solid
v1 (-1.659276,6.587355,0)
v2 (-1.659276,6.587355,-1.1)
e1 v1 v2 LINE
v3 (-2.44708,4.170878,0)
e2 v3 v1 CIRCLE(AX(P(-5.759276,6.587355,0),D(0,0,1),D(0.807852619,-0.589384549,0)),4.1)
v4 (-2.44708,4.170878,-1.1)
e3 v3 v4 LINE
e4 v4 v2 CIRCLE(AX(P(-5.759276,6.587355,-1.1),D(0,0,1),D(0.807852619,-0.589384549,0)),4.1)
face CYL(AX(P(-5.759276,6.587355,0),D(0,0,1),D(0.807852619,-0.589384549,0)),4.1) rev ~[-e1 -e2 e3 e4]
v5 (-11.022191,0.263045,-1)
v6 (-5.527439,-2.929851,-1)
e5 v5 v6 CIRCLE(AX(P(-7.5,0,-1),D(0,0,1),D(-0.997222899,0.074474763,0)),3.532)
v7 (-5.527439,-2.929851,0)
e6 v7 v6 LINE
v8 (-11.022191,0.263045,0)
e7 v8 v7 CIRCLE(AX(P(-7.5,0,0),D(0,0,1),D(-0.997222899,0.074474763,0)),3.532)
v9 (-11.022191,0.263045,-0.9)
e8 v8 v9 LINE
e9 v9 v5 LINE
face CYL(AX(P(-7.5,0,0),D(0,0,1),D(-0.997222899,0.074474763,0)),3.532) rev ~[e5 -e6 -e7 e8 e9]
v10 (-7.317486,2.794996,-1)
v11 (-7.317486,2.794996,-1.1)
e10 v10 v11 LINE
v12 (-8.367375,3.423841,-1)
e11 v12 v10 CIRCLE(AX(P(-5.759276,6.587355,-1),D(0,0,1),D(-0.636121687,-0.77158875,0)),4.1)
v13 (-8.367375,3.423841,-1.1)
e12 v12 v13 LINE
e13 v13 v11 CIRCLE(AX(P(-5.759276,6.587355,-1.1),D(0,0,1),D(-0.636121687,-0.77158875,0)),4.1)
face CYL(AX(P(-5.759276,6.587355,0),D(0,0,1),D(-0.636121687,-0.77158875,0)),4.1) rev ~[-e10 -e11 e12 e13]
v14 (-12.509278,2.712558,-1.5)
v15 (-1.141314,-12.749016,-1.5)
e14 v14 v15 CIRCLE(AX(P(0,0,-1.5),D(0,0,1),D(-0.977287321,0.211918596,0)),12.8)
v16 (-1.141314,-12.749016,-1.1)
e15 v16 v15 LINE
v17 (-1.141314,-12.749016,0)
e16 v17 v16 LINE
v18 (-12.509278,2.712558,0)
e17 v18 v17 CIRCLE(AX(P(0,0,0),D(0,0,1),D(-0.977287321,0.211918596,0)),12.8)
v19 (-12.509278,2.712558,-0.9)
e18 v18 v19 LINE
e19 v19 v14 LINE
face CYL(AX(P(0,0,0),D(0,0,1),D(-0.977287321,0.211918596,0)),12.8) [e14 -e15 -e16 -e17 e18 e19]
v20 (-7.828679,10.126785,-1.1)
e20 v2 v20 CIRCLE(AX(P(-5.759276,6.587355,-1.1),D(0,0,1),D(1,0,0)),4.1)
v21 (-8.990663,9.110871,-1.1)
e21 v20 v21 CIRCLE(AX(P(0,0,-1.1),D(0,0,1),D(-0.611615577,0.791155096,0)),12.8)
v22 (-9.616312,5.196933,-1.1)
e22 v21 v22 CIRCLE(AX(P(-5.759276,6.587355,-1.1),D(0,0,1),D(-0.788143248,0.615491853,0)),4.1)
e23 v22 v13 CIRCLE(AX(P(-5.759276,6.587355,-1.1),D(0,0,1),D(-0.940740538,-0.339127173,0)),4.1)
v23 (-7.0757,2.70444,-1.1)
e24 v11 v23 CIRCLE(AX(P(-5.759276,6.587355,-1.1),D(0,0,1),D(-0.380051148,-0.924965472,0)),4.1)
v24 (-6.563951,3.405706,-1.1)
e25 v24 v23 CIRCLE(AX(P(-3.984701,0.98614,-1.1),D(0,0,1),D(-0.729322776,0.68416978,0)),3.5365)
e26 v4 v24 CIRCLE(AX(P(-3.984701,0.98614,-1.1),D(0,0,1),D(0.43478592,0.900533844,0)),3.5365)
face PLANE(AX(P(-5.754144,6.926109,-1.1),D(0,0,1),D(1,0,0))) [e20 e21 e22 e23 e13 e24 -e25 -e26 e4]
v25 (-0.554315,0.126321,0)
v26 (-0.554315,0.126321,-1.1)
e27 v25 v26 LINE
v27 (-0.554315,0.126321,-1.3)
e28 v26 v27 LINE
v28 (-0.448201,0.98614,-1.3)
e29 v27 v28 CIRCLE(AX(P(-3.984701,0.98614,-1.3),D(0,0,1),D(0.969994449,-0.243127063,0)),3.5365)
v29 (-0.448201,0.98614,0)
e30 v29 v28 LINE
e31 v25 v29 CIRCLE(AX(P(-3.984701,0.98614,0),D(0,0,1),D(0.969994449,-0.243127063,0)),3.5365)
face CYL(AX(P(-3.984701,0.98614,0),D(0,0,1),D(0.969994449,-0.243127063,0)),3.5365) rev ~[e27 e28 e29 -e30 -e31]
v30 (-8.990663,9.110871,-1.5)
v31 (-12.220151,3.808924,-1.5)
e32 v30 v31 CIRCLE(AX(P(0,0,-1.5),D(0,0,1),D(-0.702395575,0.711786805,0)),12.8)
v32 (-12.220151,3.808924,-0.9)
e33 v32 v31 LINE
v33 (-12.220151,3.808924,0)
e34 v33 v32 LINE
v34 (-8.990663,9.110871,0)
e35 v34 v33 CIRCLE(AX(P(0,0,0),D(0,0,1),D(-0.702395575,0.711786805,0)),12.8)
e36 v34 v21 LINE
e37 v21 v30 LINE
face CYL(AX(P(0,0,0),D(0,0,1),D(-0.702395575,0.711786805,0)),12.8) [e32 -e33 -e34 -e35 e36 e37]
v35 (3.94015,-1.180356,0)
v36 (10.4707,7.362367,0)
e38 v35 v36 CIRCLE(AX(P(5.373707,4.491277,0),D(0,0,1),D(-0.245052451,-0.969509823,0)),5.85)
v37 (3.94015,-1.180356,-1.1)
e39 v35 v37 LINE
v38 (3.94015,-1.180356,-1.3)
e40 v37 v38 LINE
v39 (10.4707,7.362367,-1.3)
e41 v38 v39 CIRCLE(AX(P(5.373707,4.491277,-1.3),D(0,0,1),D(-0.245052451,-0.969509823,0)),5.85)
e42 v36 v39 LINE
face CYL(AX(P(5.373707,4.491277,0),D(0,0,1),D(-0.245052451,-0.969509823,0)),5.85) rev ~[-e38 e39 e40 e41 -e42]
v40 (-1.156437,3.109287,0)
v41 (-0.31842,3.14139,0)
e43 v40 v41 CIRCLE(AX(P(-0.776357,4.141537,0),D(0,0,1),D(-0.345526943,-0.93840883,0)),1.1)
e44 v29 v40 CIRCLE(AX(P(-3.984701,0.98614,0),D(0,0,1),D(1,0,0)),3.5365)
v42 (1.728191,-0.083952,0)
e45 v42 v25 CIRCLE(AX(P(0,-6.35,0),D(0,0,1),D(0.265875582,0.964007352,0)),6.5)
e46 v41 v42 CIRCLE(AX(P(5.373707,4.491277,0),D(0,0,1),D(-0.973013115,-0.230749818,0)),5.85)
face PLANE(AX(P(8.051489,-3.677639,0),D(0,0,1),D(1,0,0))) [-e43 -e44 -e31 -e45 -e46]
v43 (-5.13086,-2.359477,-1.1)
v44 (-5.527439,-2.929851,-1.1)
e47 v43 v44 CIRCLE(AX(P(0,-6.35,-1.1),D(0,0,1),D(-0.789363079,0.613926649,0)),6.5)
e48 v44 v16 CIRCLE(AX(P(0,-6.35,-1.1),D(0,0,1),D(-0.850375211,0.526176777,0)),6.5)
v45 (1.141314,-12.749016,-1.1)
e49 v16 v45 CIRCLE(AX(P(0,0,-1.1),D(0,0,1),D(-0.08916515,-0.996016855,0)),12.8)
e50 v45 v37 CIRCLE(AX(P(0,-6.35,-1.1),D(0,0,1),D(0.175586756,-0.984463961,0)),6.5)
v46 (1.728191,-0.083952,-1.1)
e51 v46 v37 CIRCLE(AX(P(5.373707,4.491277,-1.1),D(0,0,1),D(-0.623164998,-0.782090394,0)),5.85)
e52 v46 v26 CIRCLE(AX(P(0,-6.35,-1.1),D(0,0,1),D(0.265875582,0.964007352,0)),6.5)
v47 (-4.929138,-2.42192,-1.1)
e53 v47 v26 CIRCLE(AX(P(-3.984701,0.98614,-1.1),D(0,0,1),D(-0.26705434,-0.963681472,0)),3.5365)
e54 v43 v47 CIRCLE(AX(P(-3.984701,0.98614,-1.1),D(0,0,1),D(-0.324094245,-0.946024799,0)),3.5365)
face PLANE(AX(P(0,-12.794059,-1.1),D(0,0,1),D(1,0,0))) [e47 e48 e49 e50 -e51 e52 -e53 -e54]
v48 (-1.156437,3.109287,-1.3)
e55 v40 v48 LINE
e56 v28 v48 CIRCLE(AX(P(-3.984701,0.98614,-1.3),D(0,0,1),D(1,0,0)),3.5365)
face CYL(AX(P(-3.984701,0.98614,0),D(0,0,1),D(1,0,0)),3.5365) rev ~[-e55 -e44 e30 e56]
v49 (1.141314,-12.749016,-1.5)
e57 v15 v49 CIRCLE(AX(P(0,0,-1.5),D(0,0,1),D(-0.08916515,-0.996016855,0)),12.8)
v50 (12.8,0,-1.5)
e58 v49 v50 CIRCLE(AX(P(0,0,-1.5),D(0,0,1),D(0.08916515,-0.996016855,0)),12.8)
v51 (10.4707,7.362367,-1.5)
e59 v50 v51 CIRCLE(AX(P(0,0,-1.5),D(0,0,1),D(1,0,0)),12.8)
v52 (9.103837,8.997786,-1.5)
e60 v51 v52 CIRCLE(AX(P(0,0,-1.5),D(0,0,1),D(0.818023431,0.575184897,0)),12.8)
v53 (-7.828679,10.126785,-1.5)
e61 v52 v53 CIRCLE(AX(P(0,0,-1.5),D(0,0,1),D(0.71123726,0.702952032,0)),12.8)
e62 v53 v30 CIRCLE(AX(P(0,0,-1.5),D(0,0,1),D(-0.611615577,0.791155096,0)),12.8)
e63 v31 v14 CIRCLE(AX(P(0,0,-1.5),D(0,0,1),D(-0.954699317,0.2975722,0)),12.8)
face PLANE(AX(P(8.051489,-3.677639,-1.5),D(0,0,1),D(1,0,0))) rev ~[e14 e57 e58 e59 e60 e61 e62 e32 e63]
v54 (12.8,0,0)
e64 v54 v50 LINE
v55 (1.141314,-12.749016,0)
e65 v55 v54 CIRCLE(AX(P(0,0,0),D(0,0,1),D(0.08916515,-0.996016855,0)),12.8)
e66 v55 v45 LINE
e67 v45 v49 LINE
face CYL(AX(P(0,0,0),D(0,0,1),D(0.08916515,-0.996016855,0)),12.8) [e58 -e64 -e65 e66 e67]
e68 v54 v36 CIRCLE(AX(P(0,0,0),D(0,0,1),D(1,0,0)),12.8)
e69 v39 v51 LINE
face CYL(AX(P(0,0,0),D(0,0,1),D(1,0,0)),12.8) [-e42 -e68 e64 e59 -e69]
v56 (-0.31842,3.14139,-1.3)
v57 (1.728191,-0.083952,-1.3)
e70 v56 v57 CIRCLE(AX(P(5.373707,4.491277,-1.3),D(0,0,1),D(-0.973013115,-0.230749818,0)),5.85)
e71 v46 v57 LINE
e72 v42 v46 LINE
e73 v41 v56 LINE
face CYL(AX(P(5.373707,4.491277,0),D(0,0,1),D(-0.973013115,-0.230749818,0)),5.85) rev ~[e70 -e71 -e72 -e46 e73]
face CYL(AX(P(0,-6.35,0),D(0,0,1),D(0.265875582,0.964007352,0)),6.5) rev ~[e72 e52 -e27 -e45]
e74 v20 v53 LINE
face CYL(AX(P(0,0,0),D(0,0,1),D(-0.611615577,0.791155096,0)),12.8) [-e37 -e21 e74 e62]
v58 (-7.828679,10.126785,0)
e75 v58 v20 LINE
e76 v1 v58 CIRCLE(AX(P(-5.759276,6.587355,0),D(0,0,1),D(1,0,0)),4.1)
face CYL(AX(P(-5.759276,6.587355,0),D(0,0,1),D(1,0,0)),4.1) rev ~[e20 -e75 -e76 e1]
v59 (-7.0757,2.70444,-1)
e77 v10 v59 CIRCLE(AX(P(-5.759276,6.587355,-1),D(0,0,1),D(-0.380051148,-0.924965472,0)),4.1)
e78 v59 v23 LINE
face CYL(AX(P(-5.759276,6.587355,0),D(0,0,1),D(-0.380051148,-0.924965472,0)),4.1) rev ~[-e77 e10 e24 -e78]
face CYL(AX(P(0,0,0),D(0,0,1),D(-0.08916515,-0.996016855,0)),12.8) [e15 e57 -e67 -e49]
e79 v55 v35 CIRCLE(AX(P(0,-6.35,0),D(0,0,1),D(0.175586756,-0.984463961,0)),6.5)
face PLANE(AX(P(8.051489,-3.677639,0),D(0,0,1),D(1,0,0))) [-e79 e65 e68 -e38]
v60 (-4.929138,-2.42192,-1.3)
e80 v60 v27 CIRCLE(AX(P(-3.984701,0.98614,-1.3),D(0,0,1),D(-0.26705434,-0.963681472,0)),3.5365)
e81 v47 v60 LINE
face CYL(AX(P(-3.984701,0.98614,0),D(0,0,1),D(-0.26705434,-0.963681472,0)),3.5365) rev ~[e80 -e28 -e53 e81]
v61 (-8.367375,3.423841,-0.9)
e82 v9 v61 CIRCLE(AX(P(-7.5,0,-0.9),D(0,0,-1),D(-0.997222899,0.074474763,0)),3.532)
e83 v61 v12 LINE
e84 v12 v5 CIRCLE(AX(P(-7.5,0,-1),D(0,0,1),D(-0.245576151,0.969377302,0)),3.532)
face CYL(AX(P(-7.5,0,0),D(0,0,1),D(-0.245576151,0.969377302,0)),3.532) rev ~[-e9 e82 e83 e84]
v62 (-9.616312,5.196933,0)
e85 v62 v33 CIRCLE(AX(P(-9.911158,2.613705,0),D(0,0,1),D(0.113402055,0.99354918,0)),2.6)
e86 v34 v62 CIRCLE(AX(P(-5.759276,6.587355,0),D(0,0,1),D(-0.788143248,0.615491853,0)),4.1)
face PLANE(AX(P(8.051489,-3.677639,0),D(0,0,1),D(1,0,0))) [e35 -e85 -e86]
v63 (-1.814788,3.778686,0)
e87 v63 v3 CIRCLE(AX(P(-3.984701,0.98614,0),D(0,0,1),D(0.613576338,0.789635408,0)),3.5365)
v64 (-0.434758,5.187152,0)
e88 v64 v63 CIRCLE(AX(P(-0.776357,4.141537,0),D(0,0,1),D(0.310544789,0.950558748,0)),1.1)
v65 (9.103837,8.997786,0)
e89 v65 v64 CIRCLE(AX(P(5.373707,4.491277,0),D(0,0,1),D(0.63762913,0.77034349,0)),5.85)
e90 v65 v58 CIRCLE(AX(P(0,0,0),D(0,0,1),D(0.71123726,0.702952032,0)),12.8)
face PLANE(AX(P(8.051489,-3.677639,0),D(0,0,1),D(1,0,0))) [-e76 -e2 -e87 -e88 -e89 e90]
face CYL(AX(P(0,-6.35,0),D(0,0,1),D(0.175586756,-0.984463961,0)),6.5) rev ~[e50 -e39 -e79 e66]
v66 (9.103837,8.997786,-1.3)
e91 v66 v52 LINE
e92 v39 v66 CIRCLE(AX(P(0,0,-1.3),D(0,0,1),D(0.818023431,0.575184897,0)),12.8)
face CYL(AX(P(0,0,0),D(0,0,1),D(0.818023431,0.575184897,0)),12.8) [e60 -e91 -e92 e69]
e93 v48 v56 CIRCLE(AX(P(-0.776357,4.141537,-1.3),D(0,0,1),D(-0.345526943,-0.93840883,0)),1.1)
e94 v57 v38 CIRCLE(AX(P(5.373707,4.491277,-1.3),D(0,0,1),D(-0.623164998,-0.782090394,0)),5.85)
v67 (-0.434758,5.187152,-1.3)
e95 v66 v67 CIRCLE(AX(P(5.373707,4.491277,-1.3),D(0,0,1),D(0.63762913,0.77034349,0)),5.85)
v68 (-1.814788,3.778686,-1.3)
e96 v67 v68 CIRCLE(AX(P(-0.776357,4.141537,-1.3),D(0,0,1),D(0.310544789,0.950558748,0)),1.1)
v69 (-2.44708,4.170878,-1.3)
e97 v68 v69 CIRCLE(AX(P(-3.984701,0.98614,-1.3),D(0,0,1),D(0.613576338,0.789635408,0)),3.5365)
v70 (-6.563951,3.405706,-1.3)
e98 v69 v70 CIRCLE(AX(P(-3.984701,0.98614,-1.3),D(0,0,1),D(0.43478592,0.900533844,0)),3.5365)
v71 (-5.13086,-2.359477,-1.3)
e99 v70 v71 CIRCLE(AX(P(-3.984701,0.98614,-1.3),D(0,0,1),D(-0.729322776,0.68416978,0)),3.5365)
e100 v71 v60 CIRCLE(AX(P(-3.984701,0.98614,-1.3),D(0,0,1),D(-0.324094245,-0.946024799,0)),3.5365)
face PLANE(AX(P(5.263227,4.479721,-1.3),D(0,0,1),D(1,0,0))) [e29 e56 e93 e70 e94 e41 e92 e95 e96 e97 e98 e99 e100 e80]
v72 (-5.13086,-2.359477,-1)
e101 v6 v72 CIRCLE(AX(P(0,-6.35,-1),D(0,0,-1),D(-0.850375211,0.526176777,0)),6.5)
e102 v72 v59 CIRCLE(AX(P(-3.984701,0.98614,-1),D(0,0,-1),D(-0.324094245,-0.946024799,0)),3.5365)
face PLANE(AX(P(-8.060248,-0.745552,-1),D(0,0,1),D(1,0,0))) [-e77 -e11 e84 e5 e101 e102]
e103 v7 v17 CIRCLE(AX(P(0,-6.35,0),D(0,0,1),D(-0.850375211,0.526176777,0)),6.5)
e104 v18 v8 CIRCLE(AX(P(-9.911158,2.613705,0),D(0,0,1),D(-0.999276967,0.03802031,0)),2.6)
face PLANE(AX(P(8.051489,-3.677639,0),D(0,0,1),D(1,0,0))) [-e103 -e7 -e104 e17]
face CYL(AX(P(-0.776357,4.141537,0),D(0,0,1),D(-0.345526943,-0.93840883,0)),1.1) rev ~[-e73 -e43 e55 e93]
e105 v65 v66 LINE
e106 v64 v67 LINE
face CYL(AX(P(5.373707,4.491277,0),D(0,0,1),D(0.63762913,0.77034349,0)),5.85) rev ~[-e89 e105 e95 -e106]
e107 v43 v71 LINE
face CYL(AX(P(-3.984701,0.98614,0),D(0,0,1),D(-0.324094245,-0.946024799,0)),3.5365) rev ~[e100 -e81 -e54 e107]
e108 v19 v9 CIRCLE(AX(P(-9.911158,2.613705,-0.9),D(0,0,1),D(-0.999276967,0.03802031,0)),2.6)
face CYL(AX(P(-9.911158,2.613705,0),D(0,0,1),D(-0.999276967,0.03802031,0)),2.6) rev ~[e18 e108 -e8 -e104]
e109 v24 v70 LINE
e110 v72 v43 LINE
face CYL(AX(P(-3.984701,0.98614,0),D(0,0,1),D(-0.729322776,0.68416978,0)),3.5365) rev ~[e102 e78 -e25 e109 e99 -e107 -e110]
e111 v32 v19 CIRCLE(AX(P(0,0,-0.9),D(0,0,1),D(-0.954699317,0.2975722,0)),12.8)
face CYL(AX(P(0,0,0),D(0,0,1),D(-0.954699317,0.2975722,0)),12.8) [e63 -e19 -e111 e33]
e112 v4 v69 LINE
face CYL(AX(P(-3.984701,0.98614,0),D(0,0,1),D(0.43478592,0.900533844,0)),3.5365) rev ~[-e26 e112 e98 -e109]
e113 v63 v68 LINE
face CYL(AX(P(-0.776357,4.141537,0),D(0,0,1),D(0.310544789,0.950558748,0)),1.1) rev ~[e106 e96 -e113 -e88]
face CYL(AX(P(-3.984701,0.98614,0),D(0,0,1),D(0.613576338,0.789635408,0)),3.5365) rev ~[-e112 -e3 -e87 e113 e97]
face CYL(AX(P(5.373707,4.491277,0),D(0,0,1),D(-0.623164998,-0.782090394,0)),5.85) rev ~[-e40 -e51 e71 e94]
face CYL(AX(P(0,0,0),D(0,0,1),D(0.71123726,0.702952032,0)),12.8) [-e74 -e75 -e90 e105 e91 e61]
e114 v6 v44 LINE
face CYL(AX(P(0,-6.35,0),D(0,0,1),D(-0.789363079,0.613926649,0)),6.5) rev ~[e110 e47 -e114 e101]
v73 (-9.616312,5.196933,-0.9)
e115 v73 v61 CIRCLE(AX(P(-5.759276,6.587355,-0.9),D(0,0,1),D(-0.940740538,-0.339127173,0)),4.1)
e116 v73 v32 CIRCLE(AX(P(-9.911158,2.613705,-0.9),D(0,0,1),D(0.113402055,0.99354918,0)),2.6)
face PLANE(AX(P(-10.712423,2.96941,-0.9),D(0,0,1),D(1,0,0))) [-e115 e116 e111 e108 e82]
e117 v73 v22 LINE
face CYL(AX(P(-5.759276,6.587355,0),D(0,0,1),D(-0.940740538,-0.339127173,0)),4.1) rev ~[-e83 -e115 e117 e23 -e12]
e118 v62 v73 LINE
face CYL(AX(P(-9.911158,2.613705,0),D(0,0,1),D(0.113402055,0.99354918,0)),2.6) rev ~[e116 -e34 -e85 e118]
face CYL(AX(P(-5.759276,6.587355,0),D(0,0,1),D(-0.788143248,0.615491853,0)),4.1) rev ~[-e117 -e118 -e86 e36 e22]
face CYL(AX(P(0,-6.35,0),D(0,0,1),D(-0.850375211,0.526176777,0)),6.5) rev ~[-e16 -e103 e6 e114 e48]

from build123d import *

# Parameters (mm, degrees)
F1_DEPTH = 1.5
F2_DEPTH = 1.1
F3_DEPTH = 1.3
F4_DEPTH = 1
F5_DEPTH = 0.9
F6_DEPTH = 1.3
F7_DEPTH = 1.3
F8_DEPTH = 1.1


with BuildPart() as f1:
    # F0 (on Top) → F1 (new body)
    with BuildSketch(Plane.XY):
        with BuildLine():
            ThreePointArc((1.1413139167, -12.749015748), (9.4458673009, -8.6380316585), (12.8, 0))
            ThreePointArc((12.8, 0), (12.2037895541, 3.8610258375), (10.470699919, 7.3623666851))
            ThreePointArc((10.470699919, 7.3623666851), (10.0212563072, 0.9384212672), (3.9401496855, -1.1803558676))
            ThreePointArc((3.9401496855, -1.1803558676), (6.3177362198, -7.8784662435), (1.1413139167, -12.749015748))
        make_face()
        with BuildLine():
            ThreePointArc((3.9401496855, -1.1803558676), (10.0212563072, 0.9384212672), (10.470699919, 7.3623666851))
            ThreePointArc((10.470699919, 7.3623666851), (9.8213681495, 8.2085764705), (9.1038369322, 8.9977860117))
            ThreePointArc((9.1038369322, 8.9977860117), (3.2034297018, 9.9238080984), (-0.4347578085, 5.1871516796))
            ThreePointArc((-0.4347578085, 5.1871516796), (0.1140807918, 4.7873856476), (0.3236429235, 4.1415370565))
            ThreePointArc((0.3236429235, 4.1415370565), (0.1493131035, 3.5472856637), (-0.3184201999, 3.1413901588))
            ThreePointArc((-0.3184201999, 3.1413901588), (0.4342128527, 1.3569660974), (1.7281912806, -0.0839522107))
            ThreePointArc((1.7281912806, -0.0839522107), (2.8867018502, -0.5261737296), (3.9401496855, -1.1803558676))
        make_face()
        with BuildLine():
            ThreePointArc((-1.1413139167, -12.749015748), (0, -12.8), (1.1413139167, -12.749015748))
            ThreePointArc((1.1413139167, -12.749015748), (6.3177362198, -7.8784662435), (3.9401496855, -1.1803558676))
            ThreePointArc((3.9401496855, -1.1803558676), (2.7756748559, -0.7501670477), (1.7281912806, -0.0839522107))
            ThreePointArc((1.7281912806, -0.0839522107), (0.596280043, 0.1225922249), (-0.554315346, 0.1263210619))
            ThreePointArc((-0.554315346, 0.1263210619), (-2.2047100942, -2.0697503993), (-4.9291383896, -2.4219196064))
            ThreePointArc((-4.9291383896, -2.4219196064), (-5.2141366822, -2.6925550862), (-5.5274388721, -2.9298509512))
            ThreePointArc((-5.5274388721, -2.9298509512), (-5.9348180483, -9.0010252232), (-1.1413139167, -12.749015748))
        make_face()
        with BuildLine():
            ThreePointArc((-0.4347578085, 5.1871516796), (3.2034297018, 9.9238080984), (9.1038369322, 8.9977860117))
            ThreePointArc((9.1038369322, 8.9977860117), (0.8515670805, 12.7716417702), (-7.8286793929, 10.1267852235))
            ThreePointArc((-7.8286793929, 10.1267852235), (-3.7190007865, 10.1436555147), (-1.6592760481, 6.5873545071))
            ThreePointArc((-1.6592760481, 6.5873545071), (-1.8611994375, 5.316528501), (-2.4470803104, 4.1708778581))
            ThreePointArc((-2.4470803104, 4.1708778581), (-2.1205912314, 3.9914565549), (-1.8147879972, 3.7786855401))
            ThreePointArc((-1.8147879972, 3.7786855401), (-1.5620655496, 4.9113826225), (-0.4347578085, 5.1871516796))
        make_face()
        with BuildLine():
            ThreePointArc((1.7281912806, -0.0839522107), (2.7756748559, -0.7501670477), (3.9401496855, -1.1803558676))
            ThreePointArc((3.9401496855, -1.1803558676), (2.8867018502, -0.5261737296), (1.7281912806, -0.0839522107))
        make_face()
        with BuildLine():
            ThreePointArc((-12.5092777133, 2.7125580349), (-10.3126004927, -7.5822339107), (-1.1413139167, -12.749015748))
            ThreePointArc((-1.1413139167, -12.749015748), (-5.9348180483, -9.0010252232), (-5.5274388721, -2.9298509512))
            ThreePointArc((-5.5274388721, -2.9298509512), (-9.2745377761, -3.053856526), (-11.0221912783, 0.2630448617))
            ThreePointArc((-11.0221912783, 0.2630448617), (-12.1336526301, 1.2644403034), (-12.5092777133, 2.7125580349))
        make_face()
        with BuildLine():
            ThreePointArc((-1.6592760481, 6.5873545071), (-3.7190007865, 10.1436555147), (-7.8286793929, 10.1267852235))
            ThreePointArc((-7.8286793929, 10.1267852235), (-8.4249981047, 9.6363585932), (-8.9906633635, 9.1108711046))
            ThreePointArc((-8.9906633635, 9.1108711046), (-9.8078763851, 7.234529376), (-9.6163122558, 5.1969330987))
            ThreePointArc((-9.6163122558, 5.1969330987), (-8.3134717361, 4.6648999744), (-7.4786994453, 3.5319357704))
            ThreePointArc((-7.4786994453, 3.5319357704), (-7.0171820767, 3.4988442167), (-6.5639507121, 3.4057063483))
            ThreePointArc((-6.5639507121, 3.4057063483), (-4.6309358982, 4.4630943822), (-2.4470803104, 4.1708778581))
            ThreePointArc((-2.4470803104, 4.1708778581), (-1.8611994375, 5.316528501), (-1.6592760481, 6.5873545071))
        make_face()
        with BuildLine():
            ThreePointArc((0.3236429235, 4.1415370565), (0.1140807918, 4.7873856476), (-0.4347578085, 5.1871516796))
            ThreePointArc((-0.4347578085, 5.1871516796), (-0.4668571228, 4.1591375853), (-0.3184201999, 3.1413901588))
            ThreePointArc((-0.3184201999, 3.1413901588), (0.1493131035, 3.5472856637), (0.3236429235, 4.1415370565))
        make_face()
        with BuildLine():
            ThreePointArc((-0.3184201999, 3.1413901588), (-0.4668571228, 4.1591375853), (-0.4347578085, 5.1871516796))
            ThreePointArc((-0.4347578085, 5.1871516796), (-1.5620655496, 4.9113826225), (-1.8147879972, 3.7786855401))
            ThreePointArc((-1.8147879972, 3.7786855401), (-1.4632990979, 3.4659314694), (-1.1564367138, 3.1092873438))
            ThreePointArc((-1.1564367138, 3.1092873438), (-0.7342490593, 3.0423432998), (-0.3184201999, 3.1413901588))
        make_face()
        with BuildLine():
            ThreePointArc((-0.554315346, 0.1263210619), (0.596280043, 0.1225922249), (1.7281912806, -0.0839522107))
            ThreePointArc((1.7281912806, -0.0839522107), (0.4342128527, 1.3569660974), (-0.3184201999, 3.1413901588))
            ThreePointArc((-0.3184201999, 3.1413901588), (-0.7342490593, 3.0423432998), (-1.1564367138, 3.1092873438))
            ThreePointArc((-1.1564367138, 3.1092873438), (-0.6299288982, 2.1052191407), (-0.4482007155, 0.9861399191))
            ThreePointArc((-0.4482007155, 0.9861399191), (-0.4748296274, 0.5529688265), (-0.554315346, 0.1263210619))
        make_face()
        with BuildLine():
            ThreePointArc((-12.2201512567, 3.8089241608), (-12.3768602224, 3.2639440918), (-12.5092777133, 2.7125580349))
            ThreePointArc((-12.5092777133, 2.7125580349), (-12.1336526301, 1.2644403034), (-11.0221912783, 0.2630448617))
            ThreePointArc((-11.0221912783, 0.2630448617), (-10.204575831, 2.2716279569), (-8.3673749649, 3.4238406316))
            ThreePointArc((-8.3673749649, 3.4238406316), (-9.1112094109, 4.2263075504), (-9.6163122558, 5.1969330987))
            ThreePointArc((-9.6163122558, 5.1969330987), (-11.1342032079, 4.90808084), (-12.2201512567, 3.8089241608))
        make_face()
        with BuildLine():
            ThreePointArc((-11.0221912783, 0.2630448617), (-9.2745377761, -3.053856526), (-5.5274388721, -2.9298509512))
            ThreePointArc((-5.5274388721, -2.9298509512), (-5.3367748168, -2.6393619746), (-5.1308600113, -2.3594767831))
            ThreePointArc((-5.1308600113, -2.3594767831), (-7.2860930404, -0.2817879048), (-7.075700244, 2.704439708))
            ThreePointArc((-7.075700244, 2.704439708), (-7.1973059974, 2.7478141876), (-7.3174857567, 2.7949960715))
            ThreePointArc((-7.3174857567, 2.7949960715), (-8.4441033358, 0.4671377871), (-11.0221912783, 0.2630448617))
        make_face()
        with BuildLine():
            ThreePointArc((-5.1308600113, -2.3594767831), (-5.3367748168, -2.6393619746), (-5.5274388721, -2.9298509512))
            ThreePointArc((-5.5274388721, -2.9298509512), (-5.2141366822, -2.6925550862), (-4.9291383896, -2.4219196064))
            ThreePointArc((-4.9291383896, -2.4219196064), (-5.0304653636, -2.3922041354), (-5.1308600113, -2.3594767831))
        make_face()
        with BuildLine():
            ThreePointArc((-9.6163122558, 5.1969330987), (-9.8078763851, 7.234529376), (-8.9906633635, 9.1108711046))
            ThreePointArc((-8.9906633635, 9.1108711046), (-10.931711877, 6.6586541762), (-12.2201512567, 3.8089241608))
            ThreePointArc((-12.2201512567, 3.8089241608), (-11.1342032079, 4.90808084), (-9.6163122558, 5.1969330987))
        make_face()
        with BuildLine():
            ThreePointArc((-1.1564367138, 3.1092873438), (-1.5606188549, 3.3702177563), (-1.8147879972, 3.7786855401))
            ThreePointArc((-1.8147879972, 3.7786855401), (-2.1205912314, 3.9914565549), (-2.4470803104, 4.1708778581))
            ThreePointArc((-2.4470803104, 4.1708778581), (-3.5931195136, 3.1062963536), (-5.0544484876, 2.5483920029))
            ThreePointArc((-5.0544484876, 2.5483920029), (-4.2509453728, 1.3851599291), (-3.968, 0))
            ThreePointArc((-3.968, 0), (-4.048144568, -0.7481430857), (-4.2849411533, -1.4623339606))
            ThreePointArc((-4.2849411533, -1.4623339606), (-2.5466756884, -0.3696619712), (-0.554315346, 0.1263210619))
            ThreePointArc((-0.554315346, 0.1263210619), (-0.4748296274, 0.5529688265), (-0.4482007155, 0.9861399191))
            ThreePointArc((-0.4482007155, 0.9861399191), (-0.6299288982, 2.1052191407), (-1.1564367138, 3.1092873438))
        make_face()
        with BuildLine():
            ThreePointArc((-1.1564367138, 3.1092873438), (-1.4632990979, 3.4659314694), (-1.8147879972, 3.7786855401))
            ThreePointArc((-1.8147879972, 3.7786855401), (-1.5606188549, 3.3702177563), (-1.1564367138, 3.1092873438))
        make_face()
        with BuildLine():
            ThreePointArc((-4.9291383896, -2.4219196064), (-2.2047100942, -2.0697503993), (-0.554315346, 0.1263210619))
            ThreePointArc((-0.554315346, 0.1263210619), (-2.5466756884, -0.3696619712), (-4.2849411533, -1.4623339606))
            ThreePointArc((-4.2849411533, -1.4623339606), (-4.5675232248, -1.9686553693), (-4.9291383896, -2.4219196064))
        make_face()
        with BuildLine():
            ThreePointArc((-8.3673749649, 3.4238406316), (-10.204575831, 2.2716279569), (-11.0221912783, 0.2630448617))
            ThreePointArc((-11.0221912783, 0.2630448617), (-8.4441033358, 0.4671377871), (-7.3174857567, 2.7949960715))
            ThreePointArc((-7.3174857567, 2.7949960715), (-7.8660255018, 3.0700250173), (-8.3673749649, 3.4238406316))
        make_face()
        with BuildLine():
            ThreePointArc((-7.075700244, 2.704439708), (-7.2860930404, -0.2817879048), (-5.1308600113, -2.3594767831))
            ThreePointArc((-5.1308600113, -2.3594767831), (-4.7292223678, -1.8908009917), (-4.2849411533, -1.4623339606))
            ThreePointArc((-4.2849411533, -1.4623339606), (-4.048144568, -0.7481430857), (-3.968, 0))
            ThreePointArc((-3.968, 0), (-4.2509453728, 1.3851599291), (-5.0544484876, 2.5483920029))
            ThreePointArc((-5.0544484876, 2.5483920029), (-6.0748712519, 2.4995189346), (-7.075700244, 2.704439708))
        make_face()
        with BuildLine():
            ThreePointArc((-4.2849411533, -1.4623339606), (-4.7292223678, -1.8908009917), (-5.1308600113, -2.3594767831))
            ThreePointArc((-5.1308600113, -2.3594767831), (-5.0304653636, -2.3922041354), (-4.9291383896, -2.4219196064))
            ThreePointArc((-4.9291383896, -2.4219196064), (-4.5675232248, -1.9686553693), (-4.2849411533, -1.4623339606))
        make_face()
        with BuildLine():
            ThreePointArc((-7.4786994453, 3.5319357704), (-8.3134717361, 4.6648999744), (-9.6163122558, 5.1969330987))
            ThreePointArc((-9.6163122558, 5.1969330987), (-9.1112094109, 4.2263075504), (-8.3673749649, 3.4238406316))
            ThreePointArc((-8.3673749649, 3.4238406316), (-7.9264758102, 3.5061577807), (-7.4786994453, 3.5319357704))
        make_face()
        with BuildLine():
            ThreePointArc((-5.0544484876, 2.5483920029), (-3.5931195136, 3.1062963536), (-2.4470803104, 4.1708778581))
            ThreePointArc((-2.4470803104, 4.1708778581), (-4.6309358982, 4.4630943822), (-6.5639507121, 3.4057063483))
            ThreePointArc((-6.5639507121, 3.4057063483), (-5.7557084634, 3.0712328201), (-5.0544484876, 2.5483920029))
        make_face()
        with BuildLine():
            ThreePointArc((-7.4786994453, 3.5319357704), (-7.9264758102, 3.5061577807), (-8.3673749649, 3.4238406316))
            ThreePointArc((-8.3673749649, 3.4238406316), (-7.8660255018, 3.0700250173), (-7.3174857567, 2.7949960715))
            ThreePointArc((-7.3174857567, 2.7949960715), (-7.3712234042, 3.1693438542), (-7.4786994453, 3.5319357704))
        make_face()
        with BuildLine():
            ThreePointArc((-7.4786994453, 3.5319357704), (-7.3712234042, 3.1693438542), (-7.3174857567, 2.7949960715))
            ThreePointArc((-7.3174857567, 2.7949960715), (-7.1973059974, 2.7478141876), (-7.075700244, 2.704439708))
            ThreePointArc((-7.075700244, 2.704439708), (-6.8414254387, 3.0708356057), (-6.5639507121, 3.4057063483))
            ThreePointArc((-6.5639507121, 3.4057063483), (-7.0171820767, 3.4988442167), (-7.4786994453, 3.5319357704))
        make_face()
        with BuildLine():
            ThreePointArc((-6.5639507121, 3.4057063483), (-6.8414254387, 3.0708356057), (-7.075700244, 2.704439708))
            ThreePointArc((-7.075700244, 2.704439708), (-6.0748712519, 2.4995189346), (-5.0544484876, 2.5483920029))
            ThreePointArc((-5.0544484876, 2.5483920029), (-5.7557084634, 3.0712328201), (-6.5639507121, 3.4057063483))
        make_face()
    extrude(amount=-F1_DEPTH)

    # F0 (on Top) → F2 (cut)
    with BuildSketch(Plane.XY):
        with BuildLine():
            ThreePointArc((-1.1413139167, -12.749015748), (0, -12.85), (1.1413139167, -12.749015748))
            ThreePointArc((1.1413139167, -12.749015748), (0, -12.8), (-1.1413139167, -12.749015748))
        make_face()
        with BuildLine():
            ThreePointArc((-1.1413139167, -12.749015748), (0, -12.8), (1.1413139167, -12.749015748))
            ThreePointArc((1.1413139167, -12.749015748), (6.3177362198, -7.8784662435), (3.9401496855, -1.1803558676))
            ThreePointArc((3.9401496855, -1.1803558676), (2.7756748559, -0.7501670477), (1.7281912806, -0.0839522107))
            ThreePointArc((1.7281912806, -0.0839522107), (0.596280043, 0.1225922249), (-0.554315346, 0.1263210619))
            ThreePointArc((-0.554315346, 0.1263210619), (-2.2047100942, -2.0697503993), (-4.9291383896, -2.4219196064))
            ThreePointArc((-4.9291383896, -2.4219196064), (-5.2141366822, -2.6925550862), (-5.5274388721, -2.9298509512))
            ThreePointArc((-5.5274388721, -2.9298509512), (-5.9348180483, -9.0010252232), (-1.1413139167, -12.749015748))
        make_face()
        with BuildLine():
            ThreePointArc((1.7281912806, -0.0839522107), (2.7756748559, -0.7501670477), (3.9401496855, -1.1803558676))
            ThreePointArc((3.9401496855, -1.1803558676), (2.8867018502, -0.5261737296), (1.7281912806, -0.0839522107))
        make_face()
        with BuildLine():
            ThreePointArc((-4.9291383896, -2.4219196064), (-2.2047100942, -2.0697503993), (-0.554315346, 0.1263210619))
            ThreePointArc((-0.554315346, 0.1263210619), (-2.5466756884, -0.3696619712), (-4.2849411533, -1.4623339606))
            ThreePointArc((-4.2849411533, -1.4623339606), (-4.5675232248, -1.9686553693), (-4.9291383896, -2.4219196064))
        make_face()
        with BuildLine():
            ThreePointArc((-4.2849411533, -1.4623339606), (-4.7292223678, -1.8908009917), (-5.1308600113, -2.3594767831))
            ThreePointArc((-5.1308600113, -2.3594767831), (-5.0304653636, -2.3922041354), (-4.9291383896, -2.4219196064))
            ThreePointArc((-4.9291383896, -2.4219196064), (-4.5675232248, -1.9686553693), (-4.2849411533, -1.4623339606))
        make_face()
        with BuildLine():
            ThreePointArc((-5.1308600113, -2.3594767831), (-5.3367748168, -2.6393619746), (-5.5274388721, -2.9298509512))
            ThreePointArc((-5.5274388721, -2.9298509512), (-5.2141366822, -2.6925550862), (-4.9291383896, -2.4219196064))
            ThreePointArc((-4.9291383896, -2.4219196064), (-5.0304653636, -2.3922041354), (-5.1308600113, -2.3594767831))
        make_face()
    extrude(amount=-F2_DEPTH, mode=Mode.SUBTRACT)

    # F0 (on Top) → F3 (cut)
    with BuildSketch(Plane.XY):
        with BuildLine():
            ThreePointArc((-7.075700244, 2.704439708), (-7.2860930404, -0.2817879048), (-5.1308600113, -2.3594767831))
            ThreePointArc((-5.1308600113, -2.3594767831), (-4.7292223678, -1.8908009917), (-4.2849411533, -1.4623339606))
            ThreePointArc((-4.2849411533, -1.4623339606), (-4.048144568, -0.7481430857), (-3.968, 0))
            ThreePointArc((-3.968, 0), (-4.2509453728, 1.3851599291), (-5.0544484876, 2.5483920029))
            ThreePointArc((-5.0544484876, 2.5483920029), (-6.0748712519, 2.4995189346), (-7.075700244, 2.704439708))
        make_face()
        with BuildLine():
            ThreePointArc((-1.1564367138, 3.1092873438), (-1.5606188549, 3.3702177563), (-1.8147879972, 3.7786855401))
            ThreePointArc((-1.8147879972, 3.7786855401), (-2.1205912314, 3.9914565549), (-2.4470803104, 4.1708778581))
            ThreePointArc((-2.4470803104, 4.1708778581), (-3.5931195136, 3.1062963536), (-5.0544484876, 2.5483920029))
            ThreePointArc((-5.0544484876, 2.5483920029), (-4.2509453728, 1.3851599291), (-3.968, 0))
            ThreePointArc((-3.968, 0), (-4.048144568, -0.7481430857), (-4.2849411533, -1.4623339606))
            ThreePointArc((-4.2849411533, -1.4623339606), (-2.5466756884, -0.3696619712), (-0.554315346, 0.1263210619))
            ThreePointArc((-0.554315346, 0.1263210619), (-0.4748296274, 0.5529688265), (-0.4482007155, 0.9861399191))
            ThreePointArc((-0.4482007155, 0.9861399191), (-0.6299288982, 2.1052191407), (-1.1564367138, 3.1092873438))
        make_face()
        with BuildLine():
            ThreePointArc((-5.0544484876, 2.5483920029), (-3.5931195136, 3.1062963536), (-2.4470803104, 4.1708778581))
            ThreePointArc((-2.4470803104, 4.1708778581), (-4.6309358982, 4.4630943822), (-6.5639507121, 3.4057063483))
            ThreePointArc((-6.5639507121, 3.4057063483), (-5.7557084634, 3.0712328201), (-5.0544484876, 2.5483920029))
        make_face()
        with BuildLine():
            ThreePointArc((-6.5639507121, 3.4057063483), (-6.8414254387, 3.0708356057), (-7.075700244, 2.704439708))
            ThreePointArc((-7.075700244, 2.704439708), (-6.0748712519, 2.4995189346), (-5.0544484876, 2.5483920029))
            ThreePointArc((-5.0544484876, 2.5483920029), (-5.7557084634, 3.0712328201), (-6.5639507121, 3.4057063483))
        make_face()
        with BuildLine():
            ThreePointArc((-4.9291383896, -2.4219196064), (-2.2047100942, -2.0697503993), (-0.554315346, 0.1263210619))
            ThreePointArc((-0.554315346, 0.1263210619), (-2.5466756884, -0.3696619712), (-4.2849411533, -1.4623339606))
            ThreePointArc((-4.2849411533, -1.4623339606), (-4.5675232248, -1.9686553693), (-4.9291383896, -2.4219196064))
        make_face()
        with BuildLine():
            ThreePointArc((-4.2849411533, -1.4623339606), (-4.7292223678, -1.8908009917), (-5.1308600113, -2.3594767831))
            ThreePointArc((-5.1308600113, -2.3594767831), (-5.0304653636, -2.3922041354), (-4.9291383896, -2.4219196064))
            ThreePointArc((-4.9291383896, -2.4219196064), (-4.5675232248, -1.9686553693), (-4.2849411533, -1.4623339606))
        make_face()
        with BuildLine():
            ThreePointArc((-1.1564367138, 3.1092873438), (-1.4632990979, 3.4659314694), (-1.8147879972, 3.7786855401))
            ThreePointArc((-1.8147879972, 3.7786855401), (-1.5606188549, 3.3702177563), (-1.1564367138, 3.1092873438))
        make_face()
    extrude(amount=-F3_DEPTH, mode=Mode.SUBTRACT)

    # F0 (on Top) → F4 (cut)
    with BuildSketch(Plane.XY):
        with BuildLine():
            ThreePointArc((-11.0221912783, 0.2630448617), (-9.2745377761, -3.053856526), (-5.5274388721, -2.9298509512))
            ThreePointArc((-5.5274388721, -2.9298509512), (-5.3367748168, -2.6393619746), (-5.1308600113, -2.3594767831))
            ThreePointArc((-5.1308600113, -2.3594767831), (-7.2860930404, -0.2817879048), (-7.075700244, 2.704439708))
            ThreePointArc((-7.075700244, 2.704439708), (-7.1973059974, 2.7478141876), (-7.3174857567, 2.7949960715))
            ThreePointArc((-7.3174857567, 2.7949960715), (-8.4441033358, 0.4671377871), (-11.0221912783, 0.2630448617))
        make_face()
        with BuildLine():
            ThreePointArc((-8.3673749649, 3.4238406316), (-10.204575831, 2.2716279569), (-11.0221912783, 0.2630448617))
            ThreePointArc((-11.0221912783, 0.2630448617), (-8.4441033358, 0.4671377871), (-7.3174857567, 2.7949960715))
            ThreePointArc((-7.3174857567, 2.7949960715), (-7.8660255018, 3.0700250173), (-8.3673749649, 3.4238406316))
        make_face()
        with BuildLine():
            ThreePointArc((-7.4786994453, 3.5319357704), (-7.9264758102, 3.5061577807), (-8.3673749649, 3.4238406316))
            ThreePointArc((-8.3673749649, 3.4238406316), (-7.8660255018, 3.0700250173), (-7.3174857567, 2.7949960715))
            ThreePointArc((-7.3174857567, 2.7949960715), (-7.3712234042, 3.1693438542), (-7.4786994453, 3.5319357704))
        make_face()
        with BuildLine():
            ThreePointArc((-7.4786994453, 3.5319357704), (-7.3712234042, 3.1693438542), (-7.3174857567, 2.7949960715))
            ThreePointArc((-7.3174857567, 2.7949960715), (-7.1973059974, 2.7478141876), (-7.075700244, 2.704439708))
            ThreePointArc((-7.075700244, 2.704439708), (-6.8414254387, 3.0708356057), (-6.5639507121, 3.4057063483))
            ThreePointArc((-6.5639507121, 3.4057063483), (-7.0171820767, 3.4988442167), (-7.4786994453, 3.5319357704))
        make_face()
    extrude(amount=-F4_DEPTH, mode=Mode.SUBTRACT)

    # F0 (on Top) → F5 (cut)
    with BuildSketch(Plane.XY):
        with BuildLine():
            ThreePointArc((-12.2201512567, 3.8089241608), (-12.3768602224, 3.2639440918), (-12.5092777133, 2.7125580349))
            ThreePointArc((-12.5092777133, 2.7125580349), (-12.1336526301, 1.2644403034), (-11.0221912783, 0.2630448617))
            ThreePointArc((-11.0221912783, 0.2630448617), (-10.204575831, 2.2716279569), (-8.3673749649, 3.4238406316))
            ThreePointArc((-8.3673749649, 3.4238406316), (-9.1112094109, 4.2263075504), (-9.6163122558, 5.1969330987))
            ThreePointArc((-9.6163122558, 5.1969330987), (-11.1342032079, 4.90808084), (-12.2201512567, 3.8089241608))
        make_face()
        with BuildLine():
            ThreePointArc((-7.4786994453, 3.5319357704), (-8.3134717361, 4.6648999744), (-9.6163122558, 5.1969330987))
            ThreePointArc((-9.6163122558, 5.1969330987), (-9.1112094109, 4.2263075504), (-8.3673749649, 3.4238406316))
            ThreePointArc((-8.3673749649, 3.4238406316), (-7.9264758102, 3.5061577807), (-7.4786994453, 3.5319357704))
        make_face()
    extrude(amount=-F5_DEPTH, mode=Mode.SUBTRACT)

    # F0 (on Top) → F6 (cut)
    with BuildSketch(Plane.XY):
        with BuildLine():
            ThreePointArc((3.9401496855, -1.1803558676), (10.0212563072, 0.9384212672), (10.470699919, 7.3623666851))
            ThreePointArc((10.470699919, 7.3623666851), (9.8213681495, 8.2085764705), (9.1038369322, 8.9977860117))
            ThreePointArc((9.1038369322, 8.9977860117), (3.2034297018, 9.9238080984), (-0.4347578085, 5.1871516796))
            ThreePointArc((-0.4347578085, 5.1871516796), (0.1140807918, 4.7873856476), (0.3236429235, 4.1415370565))
            ThreePointArc((0.3236429235, 4.1415370565), (0.1493131035, 3.5472856637), (-0.3184201999, 3.1413901588))
            ThreePointArc((-0.3184201999, 3.1413901588), (0.4342128527, 1.3569660974), (1.7281912806, -0.0839522107))
            ThreePointArc((1.7281912806, -0.0839522107), (2.8867018502, -0.5261737296), (3.9401496855, -1.1803558676))
        make_face()
        with BuildLine():
            ThreePointArc((0.3236429235, 4.1415370565), (0.1140807918, 4.7873856476), (-0.4347578085, 5.1871516796))
            ThreePointArc((-0.4347578085, 5.1871516796), (-0.4668571228, 4.1591375853), (-0.3184201999, 3.1413901588))
            ThreePointArc((-0.3184201999, 3.1413901588), (0.1493131035, 3.5472856637), (0.3236429235, 4.1415370565))
        make_face()
        with BuildLine():
            ThreePointArc((1.7281912806, -0.0839522107), (2.7756748559, -0.7501670477), (3.9401496855, -1.1803558676))
            ThreePointArc((3.9401496855, -1.1803558676), (2.8867018502, -0.5261737296), (1.7281912806, -0.0839522107))
        make_face()
        with BuildLine():
            ThreePointArc((9.1038369322, 8.9977860117), (9.8213681495, 8.2085764705), (10.470699919, 7.3623666851))
            ThreePointArc((10.470699919, 7.3623666851), (9.8623786831, 8.2428525608), (9.1038369322, 8.9977860117))
        make_face()
    extrude(amount=-F6_DEPTH, mode=Mode.SUBTRACT)

    # F0 (on Top) → F7 (cut)
    with BuildSketch(Plane.XY):
        with BuildLine():
            ThreePointArc((-0.3184201999, 3.1413901588), (-0.4668571228, 4.1591375853), (-0.4347578085, 5.1871516796))
            ThreePointArc((-0.4347578085, 5.1871516796), (-1.5620655496, 4.9113826225), (-1.8147879972, 3.7786855401))
            ThreePointArc((-1.8147879972, 3.7786855401), (-1.4632990979, 3.4659314694), (-1.1564367138, 3.1092873438))
            ThreePointArc((-1.1564367138, 3.1092873438), (-0.7342490593, 3.0423432998), (-0.3184201999, 3.1413901588))
        make_face()
        with BuildLine():
            ThreePointArc((0.3236429235, 4.1415370565), (0.1140807918, 4.7873856476), (-0.4347578085, 5.1871516796))
            ThreePointArc((-0.4347578085, 5.1871516796), (-0.4668571228, 4.1591375853), (-0.3184201999, 3.1413901588))
            ThreePointArc((-0.3184201999, 3.1413901588), (0.1493131035, 3.5472856637), (0.3236429235, 4.1415370565))
        make_face()
        with BuildLine():
            ThreePointArc((-1.1564367138, 3.1092873438), (-1.4632990979, 3.4659314694), (-1.8147879972, 3.7786855401))
            ThreePointArc((-1.8147879972, 3.7786855401), (-1.5606188549, 3.3702177563), (-1.1564367138, 3.1092873438))
        make_face()
    extrude(amount=-F7_DEPTH, mode=Mode.SUBTRACT)

    # F0 (on Top) → F8 (cut)
    with BuildSketch(Plane.XY):
        with BuildLine():
            ThreePointArc((-1.6592760481, 6.5873545071), (-3.7190007865, 10.1436555147), (-7.8286793929, 10.1267852235))
            ThreePointArc((-7.8286793929, 10.1267852235), (-8.4249981047, 9.6363585932), (-8.9906633635, 9.1108711046))
            ThreePointArc((-8.9906633635, 9.1108711046), (-9.8078763851, 7.234529376), (-9.6163122558, 5.1969330987))
            ThreePointArc((-9.6163122558, 5.1969330987), (-8.3134717361, 4.6648999744), (-7.4786994453, 3.5319357704))
            ThreePointArc((-7.4786994453, 3.5319357704), (-7.0171820767, 3.4988442167), (-6.5639507121, 3.4057063483))
            ThreePointArc((-6.5639507121, 3.4057063483), (-4.6309358982, 4.4630943822), (-2.4470803104, 4.1708778581))
            ThreePointArc((-2.4470803104, 4.1708778581), (-1.8611994375, 5.316528501), (-1.6592760481, 6.5873545071))
        make_face()
        with BuildLine():
            ThreePointArc((-7.4786994453, 3.5319357704), (-8.3134717361, 4.6648999744), (-9.6163122558, 5.1969330987))
            ThreePointArc((-9.6163122558, 5.1969330987), (-9.1112094109, 4.2263075504), (-8.3673749649, 3.4238406316))
            ThreePointArc((-8.3673749649, 3.4238406316), (-7.9264758102, 3.5061577807), (-7.4786994453, 3.5319357704))
        make_face()
        with BuildLine():
            ThreePointArc((-5.0544484876, 2.5483920029), (-3.5931195136, 3.1062963536), (-2.4470803104, 4.1708778581))
            ThreePointArc((-2.4470803104, 4.1708778581), (-4.6309358982, 4.4630943822), (-6.5639507121, 3.4057063483))
            ThreePointArc((-6.5639507121, 3.4057063483), (-5.7557084634, 3.0712328201), (-5.0544484876, 2.5483920029))
        make_face()
        with BuildLine():
            ThreePointArc((-6.5639507121, 3.4057063483), (-6.8414254387, 3.0708356057), (-7.075700244, 2.704439708))
            ThreePointArc((-7.075700244, 2.704439708), (-6.0748712519, 2.4995189346), (-5.0544484876, 2.5483920029))
            ThreePointArc((-5.0544484876, 2.5483920029), (-5.7557084634, 3.0712328201), (-6.5639507121, 3.4057063483))
        make_face()
        with BuildLine():
            ThreePointArc((-7.4786994453, 3.5319357704), (-7.9264758102, 3.5061577807), (-8.3673749649, 3.4238406316))
            ThreePointArc((-8.3673749649, 3.4238406316), (-7.8660255018, 3.0700250173), (-7.3174857567, 2.7949960715))
            ThreePointArc((-7.3174857567, 2.7949960715), (-7.3712234042, 3.1693438542), (-7.4786994453, 3.5319357704))
        make_face()
        with BuildLine():
            ThreePointArc((-7.4786994453, 3.5319357704), (-7.3712234042, 3.1693438542), (-7.3174857567, 2.7949960715))
            ThreePointArc((-7.3174857567, 2.7949960715), (-7.1973059974, 2.7478141876), (-7.075700244, 2.704439708))
            ThreePointArc((-7.075700244, 2.704439708), (-6.8414254387, 3.0708356057), (-6.5639507121, 3.4057063483))
            ThreePointArc((-6.5639507121, 3.4057063483), (-7.0171820767, 3.4988442167), (-7.4786994453, 3.5319357704))
        make_face()
    extrude(amount=-F8_DEPTH, mode=Mode.SUBTRACT)


solid = f1.part
